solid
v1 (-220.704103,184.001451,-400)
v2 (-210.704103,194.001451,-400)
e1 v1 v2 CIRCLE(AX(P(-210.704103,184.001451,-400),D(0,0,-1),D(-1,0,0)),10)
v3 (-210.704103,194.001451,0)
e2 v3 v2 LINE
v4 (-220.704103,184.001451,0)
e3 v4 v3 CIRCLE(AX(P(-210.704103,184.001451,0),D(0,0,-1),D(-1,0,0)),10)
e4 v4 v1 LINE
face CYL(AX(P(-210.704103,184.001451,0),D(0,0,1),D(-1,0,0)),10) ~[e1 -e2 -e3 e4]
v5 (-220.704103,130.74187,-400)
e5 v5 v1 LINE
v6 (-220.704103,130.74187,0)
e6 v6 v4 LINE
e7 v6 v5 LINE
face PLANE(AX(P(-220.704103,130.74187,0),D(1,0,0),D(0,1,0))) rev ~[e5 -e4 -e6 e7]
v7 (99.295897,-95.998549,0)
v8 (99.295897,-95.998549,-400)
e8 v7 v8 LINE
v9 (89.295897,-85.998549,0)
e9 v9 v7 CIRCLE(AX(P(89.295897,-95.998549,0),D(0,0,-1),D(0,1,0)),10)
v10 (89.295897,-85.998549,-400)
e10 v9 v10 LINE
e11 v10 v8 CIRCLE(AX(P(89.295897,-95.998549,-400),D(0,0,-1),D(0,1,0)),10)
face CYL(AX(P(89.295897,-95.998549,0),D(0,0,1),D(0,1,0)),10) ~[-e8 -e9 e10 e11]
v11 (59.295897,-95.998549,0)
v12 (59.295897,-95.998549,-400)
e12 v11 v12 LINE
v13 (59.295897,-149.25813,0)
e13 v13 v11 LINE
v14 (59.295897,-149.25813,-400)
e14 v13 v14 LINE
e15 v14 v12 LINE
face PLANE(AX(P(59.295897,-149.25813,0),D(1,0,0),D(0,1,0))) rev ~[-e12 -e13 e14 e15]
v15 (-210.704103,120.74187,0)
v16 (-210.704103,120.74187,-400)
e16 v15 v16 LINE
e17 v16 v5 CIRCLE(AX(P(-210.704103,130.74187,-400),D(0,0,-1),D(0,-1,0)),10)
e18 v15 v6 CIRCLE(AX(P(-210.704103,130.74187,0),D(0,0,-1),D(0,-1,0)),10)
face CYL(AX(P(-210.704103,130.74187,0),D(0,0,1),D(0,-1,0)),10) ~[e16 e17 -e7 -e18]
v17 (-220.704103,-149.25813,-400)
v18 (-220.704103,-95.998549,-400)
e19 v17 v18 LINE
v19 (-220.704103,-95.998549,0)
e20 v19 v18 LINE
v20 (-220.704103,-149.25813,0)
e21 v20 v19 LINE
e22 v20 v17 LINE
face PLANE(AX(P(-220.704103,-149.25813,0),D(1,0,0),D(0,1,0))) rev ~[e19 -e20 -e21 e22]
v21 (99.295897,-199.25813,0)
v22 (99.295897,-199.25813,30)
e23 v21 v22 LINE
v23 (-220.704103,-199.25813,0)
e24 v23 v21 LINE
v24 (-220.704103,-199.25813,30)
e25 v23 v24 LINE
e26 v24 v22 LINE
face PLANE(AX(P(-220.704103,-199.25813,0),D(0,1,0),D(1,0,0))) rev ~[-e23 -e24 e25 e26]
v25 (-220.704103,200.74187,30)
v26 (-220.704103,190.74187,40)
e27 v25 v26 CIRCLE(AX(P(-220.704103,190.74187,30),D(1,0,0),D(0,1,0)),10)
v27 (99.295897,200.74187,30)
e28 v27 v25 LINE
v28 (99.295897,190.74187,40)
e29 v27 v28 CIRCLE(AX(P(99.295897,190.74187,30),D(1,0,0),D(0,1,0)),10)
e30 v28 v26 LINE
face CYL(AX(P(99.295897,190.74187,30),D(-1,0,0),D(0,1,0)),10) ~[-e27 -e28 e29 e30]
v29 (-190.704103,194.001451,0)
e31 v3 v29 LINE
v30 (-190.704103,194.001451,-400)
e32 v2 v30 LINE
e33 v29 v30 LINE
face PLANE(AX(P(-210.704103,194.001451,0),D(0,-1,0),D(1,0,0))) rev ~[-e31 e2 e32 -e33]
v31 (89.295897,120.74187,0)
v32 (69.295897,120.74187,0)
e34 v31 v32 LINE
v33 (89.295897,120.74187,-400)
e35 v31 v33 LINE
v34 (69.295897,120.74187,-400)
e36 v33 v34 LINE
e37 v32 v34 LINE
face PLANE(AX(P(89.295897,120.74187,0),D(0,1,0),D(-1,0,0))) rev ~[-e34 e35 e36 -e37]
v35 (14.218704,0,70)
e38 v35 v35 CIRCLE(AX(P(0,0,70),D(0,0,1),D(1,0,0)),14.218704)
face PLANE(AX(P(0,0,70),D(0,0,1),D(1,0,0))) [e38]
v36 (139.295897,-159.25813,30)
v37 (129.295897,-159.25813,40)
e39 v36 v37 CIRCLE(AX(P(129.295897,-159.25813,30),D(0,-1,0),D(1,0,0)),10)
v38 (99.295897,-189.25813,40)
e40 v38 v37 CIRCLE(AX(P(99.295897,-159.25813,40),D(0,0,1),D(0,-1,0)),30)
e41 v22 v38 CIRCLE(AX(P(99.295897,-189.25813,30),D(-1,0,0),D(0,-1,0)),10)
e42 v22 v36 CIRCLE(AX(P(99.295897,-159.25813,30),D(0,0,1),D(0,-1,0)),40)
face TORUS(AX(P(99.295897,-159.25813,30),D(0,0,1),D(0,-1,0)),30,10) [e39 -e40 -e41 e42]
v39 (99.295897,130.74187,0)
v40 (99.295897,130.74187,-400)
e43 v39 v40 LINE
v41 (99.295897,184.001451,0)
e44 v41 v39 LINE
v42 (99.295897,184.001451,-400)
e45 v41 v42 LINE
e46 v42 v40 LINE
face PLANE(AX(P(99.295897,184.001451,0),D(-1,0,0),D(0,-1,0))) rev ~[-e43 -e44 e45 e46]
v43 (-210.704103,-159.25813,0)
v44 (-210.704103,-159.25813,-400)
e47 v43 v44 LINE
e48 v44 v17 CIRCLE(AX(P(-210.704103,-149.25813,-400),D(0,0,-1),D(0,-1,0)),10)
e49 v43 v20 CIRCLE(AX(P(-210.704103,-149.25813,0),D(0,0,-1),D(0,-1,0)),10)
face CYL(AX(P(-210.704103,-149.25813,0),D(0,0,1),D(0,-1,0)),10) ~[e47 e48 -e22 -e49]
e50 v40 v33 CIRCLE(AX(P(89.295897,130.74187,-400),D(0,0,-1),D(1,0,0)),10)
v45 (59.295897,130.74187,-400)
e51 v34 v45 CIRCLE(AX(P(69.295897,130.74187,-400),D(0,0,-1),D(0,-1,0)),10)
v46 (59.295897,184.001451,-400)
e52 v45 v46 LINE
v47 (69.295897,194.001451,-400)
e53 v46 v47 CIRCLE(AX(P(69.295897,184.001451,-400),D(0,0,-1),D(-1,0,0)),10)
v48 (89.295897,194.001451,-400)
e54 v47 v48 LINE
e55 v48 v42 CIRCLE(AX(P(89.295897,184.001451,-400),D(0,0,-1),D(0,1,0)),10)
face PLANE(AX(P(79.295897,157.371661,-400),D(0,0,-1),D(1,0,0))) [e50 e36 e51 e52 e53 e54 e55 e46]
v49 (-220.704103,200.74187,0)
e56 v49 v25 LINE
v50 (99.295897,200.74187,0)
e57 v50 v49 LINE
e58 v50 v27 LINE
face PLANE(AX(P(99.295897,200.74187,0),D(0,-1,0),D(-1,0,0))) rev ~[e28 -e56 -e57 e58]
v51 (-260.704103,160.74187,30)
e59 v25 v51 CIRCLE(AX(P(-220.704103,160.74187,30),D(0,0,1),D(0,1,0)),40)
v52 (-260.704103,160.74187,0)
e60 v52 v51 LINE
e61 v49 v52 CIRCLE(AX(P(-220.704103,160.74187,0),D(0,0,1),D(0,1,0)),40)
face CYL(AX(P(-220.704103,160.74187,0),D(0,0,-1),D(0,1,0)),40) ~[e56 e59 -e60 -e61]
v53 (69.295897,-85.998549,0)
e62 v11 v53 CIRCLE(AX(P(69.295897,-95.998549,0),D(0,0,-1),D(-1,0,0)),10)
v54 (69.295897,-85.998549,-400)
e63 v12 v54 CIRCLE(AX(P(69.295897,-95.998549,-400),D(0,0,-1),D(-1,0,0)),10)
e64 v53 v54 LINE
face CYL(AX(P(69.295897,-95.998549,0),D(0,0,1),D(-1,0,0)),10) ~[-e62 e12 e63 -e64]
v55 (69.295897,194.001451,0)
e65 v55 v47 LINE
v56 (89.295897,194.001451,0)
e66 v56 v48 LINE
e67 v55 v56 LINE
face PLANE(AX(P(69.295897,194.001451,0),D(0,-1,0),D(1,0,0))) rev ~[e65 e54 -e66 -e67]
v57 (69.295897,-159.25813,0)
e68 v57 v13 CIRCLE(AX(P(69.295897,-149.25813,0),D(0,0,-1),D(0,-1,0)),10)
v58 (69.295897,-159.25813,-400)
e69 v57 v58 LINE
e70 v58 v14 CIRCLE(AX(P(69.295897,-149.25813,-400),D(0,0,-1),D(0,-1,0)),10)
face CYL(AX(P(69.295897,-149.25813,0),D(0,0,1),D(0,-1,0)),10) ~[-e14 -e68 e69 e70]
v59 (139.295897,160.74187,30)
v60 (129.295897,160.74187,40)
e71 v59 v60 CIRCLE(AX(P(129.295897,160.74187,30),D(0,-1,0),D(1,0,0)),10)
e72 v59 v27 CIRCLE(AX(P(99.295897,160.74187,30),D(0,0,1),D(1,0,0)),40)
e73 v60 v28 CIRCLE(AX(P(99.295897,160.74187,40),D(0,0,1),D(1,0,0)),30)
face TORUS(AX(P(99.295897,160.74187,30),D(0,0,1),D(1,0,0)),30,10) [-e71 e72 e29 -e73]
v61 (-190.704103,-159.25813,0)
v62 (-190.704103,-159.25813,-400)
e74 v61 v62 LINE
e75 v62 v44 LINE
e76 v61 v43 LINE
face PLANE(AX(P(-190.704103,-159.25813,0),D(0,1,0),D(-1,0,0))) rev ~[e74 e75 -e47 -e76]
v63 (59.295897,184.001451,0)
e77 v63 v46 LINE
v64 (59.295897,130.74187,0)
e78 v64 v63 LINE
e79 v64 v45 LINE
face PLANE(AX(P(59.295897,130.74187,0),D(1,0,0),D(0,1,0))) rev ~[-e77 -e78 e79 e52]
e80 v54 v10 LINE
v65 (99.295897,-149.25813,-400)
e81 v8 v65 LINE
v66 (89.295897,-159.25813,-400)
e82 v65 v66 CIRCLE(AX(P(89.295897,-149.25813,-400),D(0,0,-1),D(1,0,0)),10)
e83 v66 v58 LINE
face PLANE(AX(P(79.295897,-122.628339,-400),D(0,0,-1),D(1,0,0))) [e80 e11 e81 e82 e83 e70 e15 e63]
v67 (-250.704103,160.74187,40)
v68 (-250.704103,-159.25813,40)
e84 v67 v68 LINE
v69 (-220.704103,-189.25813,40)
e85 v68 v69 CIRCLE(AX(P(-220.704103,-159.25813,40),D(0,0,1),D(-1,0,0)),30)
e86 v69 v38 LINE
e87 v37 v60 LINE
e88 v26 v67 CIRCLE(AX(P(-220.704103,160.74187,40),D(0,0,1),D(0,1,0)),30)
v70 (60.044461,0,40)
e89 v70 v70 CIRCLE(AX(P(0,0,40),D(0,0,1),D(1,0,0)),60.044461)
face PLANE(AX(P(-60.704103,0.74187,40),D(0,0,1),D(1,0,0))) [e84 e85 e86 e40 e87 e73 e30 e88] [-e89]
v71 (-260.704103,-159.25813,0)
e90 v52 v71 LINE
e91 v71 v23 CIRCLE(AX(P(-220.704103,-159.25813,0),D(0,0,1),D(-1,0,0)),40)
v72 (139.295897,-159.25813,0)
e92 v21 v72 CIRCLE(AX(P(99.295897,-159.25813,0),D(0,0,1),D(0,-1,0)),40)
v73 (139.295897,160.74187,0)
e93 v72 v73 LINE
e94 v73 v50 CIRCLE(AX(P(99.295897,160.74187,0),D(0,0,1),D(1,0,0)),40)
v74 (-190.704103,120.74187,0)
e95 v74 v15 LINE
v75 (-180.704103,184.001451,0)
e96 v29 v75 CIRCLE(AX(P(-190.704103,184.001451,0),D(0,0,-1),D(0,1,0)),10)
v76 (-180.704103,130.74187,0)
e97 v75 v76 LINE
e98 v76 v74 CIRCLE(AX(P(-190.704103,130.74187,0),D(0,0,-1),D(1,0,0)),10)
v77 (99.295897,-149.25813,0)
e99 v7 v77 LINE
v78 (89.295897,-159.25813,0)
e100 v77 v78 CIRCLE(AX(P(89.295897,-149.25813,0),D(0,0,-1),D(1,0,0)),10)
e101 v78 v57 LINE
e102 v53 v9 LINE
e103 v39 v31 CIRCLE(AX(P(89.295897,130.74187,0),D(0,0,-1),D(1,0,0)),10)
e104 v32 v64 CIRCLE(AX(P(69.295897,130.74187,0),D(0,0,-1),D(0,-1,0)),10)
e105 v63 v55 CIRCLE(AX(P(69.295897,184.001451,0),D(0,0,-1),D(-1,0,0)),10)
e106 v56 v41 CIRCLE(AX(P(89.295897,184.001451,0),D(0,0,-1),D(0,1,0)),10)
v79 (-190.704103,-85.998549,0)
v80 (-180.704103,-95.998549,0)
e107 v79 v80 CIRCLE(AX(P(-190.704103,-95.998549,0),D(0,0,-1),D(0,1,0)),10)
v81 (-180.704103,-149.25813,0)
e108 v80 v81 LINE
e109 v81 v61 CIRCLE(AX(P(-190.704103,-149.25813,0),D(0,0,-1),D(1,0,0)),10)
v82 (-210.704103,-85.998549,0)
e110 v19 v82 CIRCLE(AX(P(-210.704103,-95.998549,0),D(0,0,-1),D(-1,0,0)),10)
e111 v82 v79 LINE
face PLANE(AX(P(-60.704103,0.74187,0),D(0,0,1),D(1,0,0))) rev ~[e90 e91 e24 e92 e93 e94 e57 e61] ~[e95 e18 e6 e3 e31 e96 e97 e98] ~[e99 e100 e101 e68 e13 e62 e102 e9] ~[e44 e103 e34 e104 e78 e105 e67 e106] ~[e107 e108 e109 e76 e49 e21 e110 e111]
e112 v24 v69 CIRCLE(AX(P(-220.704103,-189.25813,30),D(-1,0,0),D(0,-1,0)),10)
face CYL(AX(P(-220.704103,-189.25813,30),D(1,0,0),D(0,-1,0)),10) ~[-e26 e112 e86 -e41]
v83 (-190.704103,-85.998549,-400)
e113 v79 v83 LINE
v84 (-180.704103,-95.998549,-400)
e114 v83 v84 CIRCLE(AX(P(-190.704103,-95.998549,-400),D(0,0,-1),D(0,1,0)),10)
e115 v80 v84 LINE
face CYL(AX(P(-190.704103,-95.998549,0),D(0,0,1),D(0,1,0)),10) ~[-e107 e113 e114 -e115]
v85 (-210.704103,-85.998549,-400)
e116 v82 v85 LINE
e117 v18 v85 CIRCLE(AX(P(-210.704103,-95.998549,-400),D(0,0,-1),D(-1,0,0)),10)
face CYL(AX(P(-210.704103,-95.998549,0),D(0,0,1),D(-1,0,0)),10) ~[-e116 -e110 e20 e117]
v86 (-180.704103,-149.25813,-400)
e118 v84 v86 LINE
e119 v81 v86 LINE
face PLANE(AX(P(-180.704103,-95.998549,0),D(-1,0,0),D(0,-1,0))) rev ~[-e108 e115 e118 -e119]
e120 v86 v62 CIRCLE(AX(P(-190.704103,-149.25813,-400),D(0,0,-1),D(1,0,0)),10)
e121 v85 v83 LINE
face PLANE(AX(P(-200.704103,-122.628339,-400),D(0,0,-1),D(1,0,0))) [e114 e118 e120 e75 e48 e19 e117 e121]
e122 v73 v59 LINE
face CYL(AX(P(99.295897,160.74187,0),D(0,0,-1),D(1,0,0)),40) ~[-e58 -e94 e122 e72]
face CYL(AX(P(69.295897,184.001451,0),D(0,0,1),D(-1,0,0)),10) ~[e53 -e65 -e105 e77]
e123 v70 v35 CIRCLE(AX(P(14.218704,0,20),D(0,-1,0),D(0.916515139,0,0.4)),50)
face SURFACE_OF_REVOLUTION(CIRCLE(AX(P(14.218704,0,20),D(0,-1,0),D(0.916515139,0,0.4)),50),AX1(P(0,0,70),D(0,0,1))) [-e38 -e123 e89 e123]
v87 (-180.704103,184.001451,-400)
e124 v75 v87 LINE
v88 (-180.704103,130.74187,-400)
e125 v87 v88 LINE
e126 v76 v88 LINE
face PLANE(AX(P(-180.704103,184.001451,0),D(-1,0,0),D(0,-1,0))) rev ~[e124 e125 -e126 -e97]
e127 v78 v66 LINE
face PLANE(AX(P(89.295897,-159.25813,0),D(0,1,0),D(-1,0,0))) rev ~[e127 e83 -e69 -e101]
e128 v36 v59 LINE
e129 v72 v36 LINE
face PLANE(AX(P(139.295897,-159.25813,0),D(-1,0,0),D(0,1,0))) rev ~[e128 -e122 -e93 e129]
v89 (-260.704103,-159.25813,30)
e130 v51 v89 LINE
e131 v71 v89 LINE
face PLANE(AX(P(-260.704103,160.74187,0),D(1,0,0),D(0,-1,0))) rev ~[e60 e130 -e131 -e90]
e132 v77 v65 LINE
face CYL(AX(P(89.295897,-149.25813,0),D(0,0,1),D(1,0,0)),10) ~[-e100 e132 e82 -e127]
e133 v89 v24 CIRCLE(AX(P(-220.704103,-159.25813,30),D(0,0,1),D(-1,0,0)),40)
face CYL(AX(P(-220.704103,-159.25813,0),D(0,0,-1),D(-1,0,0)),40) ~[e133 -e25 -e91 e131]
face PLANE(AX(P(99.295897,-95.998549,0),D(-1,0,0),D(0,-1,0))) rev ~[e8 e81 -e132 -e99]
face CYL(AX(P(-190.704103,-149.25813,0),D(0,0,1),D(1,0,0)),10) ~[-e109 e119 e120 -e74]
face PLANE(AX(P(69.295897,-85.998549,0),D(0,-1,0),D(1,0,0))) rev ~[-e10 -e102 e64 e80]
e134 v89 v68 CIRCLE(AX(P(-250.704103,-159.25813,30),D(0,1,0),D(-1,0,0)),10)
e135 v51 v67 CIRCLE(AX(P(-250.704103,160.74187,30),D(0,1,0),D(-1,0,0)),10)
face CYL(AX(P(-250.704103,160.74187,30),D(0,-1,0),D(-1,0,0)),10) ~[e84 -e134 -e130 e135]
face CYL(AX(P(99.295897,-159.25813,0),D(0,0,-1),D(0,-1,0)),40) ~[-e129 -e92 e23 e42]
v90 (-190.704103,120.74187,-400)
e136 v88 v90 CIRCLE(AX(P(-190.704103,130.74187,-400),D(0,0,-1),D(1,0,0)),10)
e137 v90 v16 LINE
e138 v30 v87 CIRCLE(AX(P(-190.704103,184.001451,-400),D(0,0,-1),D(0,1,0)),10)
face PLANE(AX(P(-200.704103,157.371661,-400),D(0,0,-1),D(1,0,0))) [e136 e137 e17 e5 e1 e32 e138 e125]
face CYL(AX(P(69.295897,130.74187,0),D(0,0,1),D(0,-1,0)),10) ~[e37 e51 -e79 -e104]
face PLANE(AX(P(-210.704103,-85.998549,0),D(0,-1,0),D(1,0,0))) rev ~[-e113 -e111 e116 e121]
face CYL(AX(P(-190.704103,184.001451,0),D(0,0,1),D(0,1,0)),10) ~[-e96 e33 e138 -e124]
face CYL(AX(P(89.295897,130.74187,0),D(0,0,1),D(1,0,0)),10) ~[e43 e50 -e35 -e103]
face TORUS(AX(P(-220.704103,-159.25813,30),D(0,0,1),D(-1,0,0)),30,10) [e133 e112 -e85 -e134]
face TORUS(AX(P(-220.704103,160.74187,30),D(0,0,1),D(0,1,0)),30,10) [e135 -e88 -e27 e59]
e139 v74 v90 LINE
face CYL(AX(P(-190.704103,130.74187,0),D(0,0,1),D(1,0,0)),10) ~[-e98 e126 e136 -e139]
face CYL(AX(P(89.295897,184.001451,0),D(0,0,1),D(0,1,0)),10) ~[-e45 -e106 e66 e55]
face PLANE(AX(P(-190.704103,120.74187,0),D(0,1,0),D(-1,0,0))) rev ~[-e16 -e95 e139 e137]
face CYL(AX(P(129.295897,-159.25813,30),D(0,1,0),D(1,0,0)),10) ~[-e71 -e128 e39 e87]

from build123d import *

# Parameters (mm, degrees)
F1_DEPTH = 40
F2_R     = 10
F4_DEPTH = 400
F5_R     = 60.0444611856
F6_DEPTH = 30


# Not quite as in the source:
# - a fillet or chamfer that OpenCascade refuses, or shapes differently, is made with other operations: its cross-section is extruded or revolved along the edge and cut away or added


with BuildPart() as f1:
    # F0 (on Top) → F1 (new body)
    with BuildSketch(Plane.XY):
        with BuildLine():
            ThreePointArc((-260.7041027397, -159.2581299295), (-248.9883739872, -187.542401177), (-220.7041027397, -199.2581299295))
            Line((-220.7041027397, -199.2581299295), (99.2958972603, -199.2581299295))
            ThreePointArc((99.2958972603, -199.2581299295), (127.5801685078, -187.542401177), (139.2958972603, -159.2581299295))
            Line((139.2958972603, -159.2581299295), (139.2958972603, 160.7418700705))
            ThreePointArc((139.2958972603, 160.7418700705), (127.5801685078, 189.0261413179), (99.2958972603, 200.7418700705))
            Line((99.2958972603, 200.7418700705), (-220.7041027397, 200.7418700705))
            ThreePointArc((-220.7041027397, 200.7418700705), (-248.9883739872, 189.0261413179), (-260.7041027397, 160.7418700705))
            Line((-260.7041027397, 160.7418700705), (-260.7041027397, -159.2581299295))
        make_face()
    extrude(amount=F1_DEPTH)

    # F2
    f2_edges = [f1.edges().sort_by_distance(p)[0] for p in [
        (-260.704103, 0.74187, 40),
        (-248.988374, -187.542401, 40),
        (-60.704103, -199.25813, 40),
        (127.580169, -187.542401, 40),
        (139.295897, 0.74187, 40),
        (127.580169, 189.026141, 40),
        (-60.704103, 200.74187, 40),
        (-248.988374, 189.026141, 40),
    ]]
    fillet(f2_edges, radius=F2_R)

    # F3 (on face) → F4 (join)
    with BuildSketch(Plane(origin=(0, 0, 0), x_dir=(1, 0, 0), z_dir=(0, 0, -1))):
        with BuildLine():
            Line((99.2958972603, -184.0014514797), (99.2958972603, -130.7418700705))
            ThreePointArc((99.2958972603, -130.7418700705), (96.3669650722, -123.6708022586), (89.2958972603, -120.7418700705))
            Line((89.2958972603, -120.7418700705), (69.2958972603, -120.7418700705))
            ThreePointArc((69.2958972603, -120.7418700705), (62.2248294484, -123.6708022586), (59.2958972603, -130.7418700705))
            Line((59.2958972603, -130.7418700705), (59.2958972603, -184.0014514797))
            ThreePointArc((59.2958972603, -184.0014514797), (62.2248294484, -191.0725192915), (69.2958972603, -194.0014514797))
            Line((69.2958972603, -194.0014514797), (89.2958972603, -194.0014514797))
            ThreePointArc((89.2958972603, -194.0014514797), (96.3669650722, -191.0725192915), (99.2958972603, -184.0014514797))
        make_face()
        with BuildLine():
            ThreePointArc((99.2958972603, 149.2581299295), (96.3669650722, 156.3291977414), (89.2958972603, 159.2581299295))
            Line((89.2958972603, 159.2581299295), (69.2958972603, 159.2581299295))
            ThreePointArc((69.2958972603, 159.2581299295), (62.2248294484, 156.3291977414), (59.2958972603, 149.2581299295))
            Line((59.2958972603, 149.2581299295), (59.2958972603, 95.9985485203))
            ThreePointArc((59.2958972603, 95.9985485203), (62.2248294484, 88.9274807085), (69.2958972603, 85.9985485203))
            Line((69.2958972603, 85.9985485203), (89.2958972603, 85.9985485203))
            ThreePointArc((89.2958972603, 85.9985485203), (96.3669650722, 88.9274807085), (99.2958972603, 95.9985485203))
            Line((99.2958972603, 95.9985485203), (99.2958972603, 149.2581299295))
        make_face()
        with BuildLine():
            Line((-180.7041027397, 95.9985485203), (-180.7041027397, 149.2581299295))
            ThreePointArc((-180.7041027397, 149.2581299295), (-183.6330349278, 156.3291977414), (-190.7041027397, 159.2581299295))
            Line((-190.7041027397, 159.2581299295), (-210.7041027397, 159.2581299295))
            ThreePointArc((-210.7041027397, 159.2581299295), (-217.7751705516, 156.3291977414), (-220.7041027397, 149.2581299295))
            Line((-220.7041027397, 149.2581299295), (-220.7041027397, 95.9985485203))
            ThreePointArc((-220.7041027397, 95.9985485203), (-217.7751705516, 88.9274807085), (-210.7041027397, 85.9985485203))
            Line((-210.7041027397, 85.9985485203), (-190.7041027397, 85.9985485203))
            ThreePointArc((-190.7041027397, 85.9985485203), (-183.6330349278, 88.9274807085), (-180.7041027397, 95.9985485203))
        make_face()
        with BuildLine():
            Line((-180.7041027397, -184.0014514797), (-180.7041027397, -130.7418700705))
            ThreePointArc((-180.7041027397, -130.7418700705), (-183.6330349278, -123.6708022586), (-190.7041027397, -120.7418700705))
            Line((-190.7041027397, -120.7418700705), (-210.7041027397, -120.7418700705))
            ThreePointArc((-210.7041027397, -120.7418700705), (-217.7751705516, -123.6708022586), (-220.7041027397, -130.7418700705))
            Line((-220.7041027397, -130.7418700705), (-220.7041027397, -184.0014514797))
            ThreePointArc((-220.7041027397, -184.0014514797), (-217.7751705516, -191.0725192915), (-210.7041027397, -194.0014514797))
            Line((-210.7041027397, -194.0014514797), (-190.7041027397, -194.0014514797))
            ThreePointArc((-190.7041027397, -194.0014514797), (-183.6330349278, -191.0725192915), (-180.7041027397, -184.0014514797))
        make_face()
    extrude(amount=F4_DEPTH)

    # F5 (on face) → F6 (join)
    with BuildSketch(Plane.XY.offset(40)):
        Circle(F5_R)
    extrude(amount=F6_DEPTH)

    # F7: fillet of radius 50 on 1 edges, made by hand

    # F7_s1 → F7_t2 (revolve, cut)
    with BuildSketch(Plane.XZ):
        with BuildLine():
            ThreePointArc((60.0444611856, 40), (41.6048321113, 61.8330013267), (14.218704236, 70))
            Line((14.218704236, 70), (60.0444611856, 70))
            Line((60.0444611856, 70), (60.0444611856, 40))
        make_face()
    revolve(axis=Axis((0, 0, 70), (0, 0, 1)), mode=Mode.SUBTRACT)


solid = f1.part
